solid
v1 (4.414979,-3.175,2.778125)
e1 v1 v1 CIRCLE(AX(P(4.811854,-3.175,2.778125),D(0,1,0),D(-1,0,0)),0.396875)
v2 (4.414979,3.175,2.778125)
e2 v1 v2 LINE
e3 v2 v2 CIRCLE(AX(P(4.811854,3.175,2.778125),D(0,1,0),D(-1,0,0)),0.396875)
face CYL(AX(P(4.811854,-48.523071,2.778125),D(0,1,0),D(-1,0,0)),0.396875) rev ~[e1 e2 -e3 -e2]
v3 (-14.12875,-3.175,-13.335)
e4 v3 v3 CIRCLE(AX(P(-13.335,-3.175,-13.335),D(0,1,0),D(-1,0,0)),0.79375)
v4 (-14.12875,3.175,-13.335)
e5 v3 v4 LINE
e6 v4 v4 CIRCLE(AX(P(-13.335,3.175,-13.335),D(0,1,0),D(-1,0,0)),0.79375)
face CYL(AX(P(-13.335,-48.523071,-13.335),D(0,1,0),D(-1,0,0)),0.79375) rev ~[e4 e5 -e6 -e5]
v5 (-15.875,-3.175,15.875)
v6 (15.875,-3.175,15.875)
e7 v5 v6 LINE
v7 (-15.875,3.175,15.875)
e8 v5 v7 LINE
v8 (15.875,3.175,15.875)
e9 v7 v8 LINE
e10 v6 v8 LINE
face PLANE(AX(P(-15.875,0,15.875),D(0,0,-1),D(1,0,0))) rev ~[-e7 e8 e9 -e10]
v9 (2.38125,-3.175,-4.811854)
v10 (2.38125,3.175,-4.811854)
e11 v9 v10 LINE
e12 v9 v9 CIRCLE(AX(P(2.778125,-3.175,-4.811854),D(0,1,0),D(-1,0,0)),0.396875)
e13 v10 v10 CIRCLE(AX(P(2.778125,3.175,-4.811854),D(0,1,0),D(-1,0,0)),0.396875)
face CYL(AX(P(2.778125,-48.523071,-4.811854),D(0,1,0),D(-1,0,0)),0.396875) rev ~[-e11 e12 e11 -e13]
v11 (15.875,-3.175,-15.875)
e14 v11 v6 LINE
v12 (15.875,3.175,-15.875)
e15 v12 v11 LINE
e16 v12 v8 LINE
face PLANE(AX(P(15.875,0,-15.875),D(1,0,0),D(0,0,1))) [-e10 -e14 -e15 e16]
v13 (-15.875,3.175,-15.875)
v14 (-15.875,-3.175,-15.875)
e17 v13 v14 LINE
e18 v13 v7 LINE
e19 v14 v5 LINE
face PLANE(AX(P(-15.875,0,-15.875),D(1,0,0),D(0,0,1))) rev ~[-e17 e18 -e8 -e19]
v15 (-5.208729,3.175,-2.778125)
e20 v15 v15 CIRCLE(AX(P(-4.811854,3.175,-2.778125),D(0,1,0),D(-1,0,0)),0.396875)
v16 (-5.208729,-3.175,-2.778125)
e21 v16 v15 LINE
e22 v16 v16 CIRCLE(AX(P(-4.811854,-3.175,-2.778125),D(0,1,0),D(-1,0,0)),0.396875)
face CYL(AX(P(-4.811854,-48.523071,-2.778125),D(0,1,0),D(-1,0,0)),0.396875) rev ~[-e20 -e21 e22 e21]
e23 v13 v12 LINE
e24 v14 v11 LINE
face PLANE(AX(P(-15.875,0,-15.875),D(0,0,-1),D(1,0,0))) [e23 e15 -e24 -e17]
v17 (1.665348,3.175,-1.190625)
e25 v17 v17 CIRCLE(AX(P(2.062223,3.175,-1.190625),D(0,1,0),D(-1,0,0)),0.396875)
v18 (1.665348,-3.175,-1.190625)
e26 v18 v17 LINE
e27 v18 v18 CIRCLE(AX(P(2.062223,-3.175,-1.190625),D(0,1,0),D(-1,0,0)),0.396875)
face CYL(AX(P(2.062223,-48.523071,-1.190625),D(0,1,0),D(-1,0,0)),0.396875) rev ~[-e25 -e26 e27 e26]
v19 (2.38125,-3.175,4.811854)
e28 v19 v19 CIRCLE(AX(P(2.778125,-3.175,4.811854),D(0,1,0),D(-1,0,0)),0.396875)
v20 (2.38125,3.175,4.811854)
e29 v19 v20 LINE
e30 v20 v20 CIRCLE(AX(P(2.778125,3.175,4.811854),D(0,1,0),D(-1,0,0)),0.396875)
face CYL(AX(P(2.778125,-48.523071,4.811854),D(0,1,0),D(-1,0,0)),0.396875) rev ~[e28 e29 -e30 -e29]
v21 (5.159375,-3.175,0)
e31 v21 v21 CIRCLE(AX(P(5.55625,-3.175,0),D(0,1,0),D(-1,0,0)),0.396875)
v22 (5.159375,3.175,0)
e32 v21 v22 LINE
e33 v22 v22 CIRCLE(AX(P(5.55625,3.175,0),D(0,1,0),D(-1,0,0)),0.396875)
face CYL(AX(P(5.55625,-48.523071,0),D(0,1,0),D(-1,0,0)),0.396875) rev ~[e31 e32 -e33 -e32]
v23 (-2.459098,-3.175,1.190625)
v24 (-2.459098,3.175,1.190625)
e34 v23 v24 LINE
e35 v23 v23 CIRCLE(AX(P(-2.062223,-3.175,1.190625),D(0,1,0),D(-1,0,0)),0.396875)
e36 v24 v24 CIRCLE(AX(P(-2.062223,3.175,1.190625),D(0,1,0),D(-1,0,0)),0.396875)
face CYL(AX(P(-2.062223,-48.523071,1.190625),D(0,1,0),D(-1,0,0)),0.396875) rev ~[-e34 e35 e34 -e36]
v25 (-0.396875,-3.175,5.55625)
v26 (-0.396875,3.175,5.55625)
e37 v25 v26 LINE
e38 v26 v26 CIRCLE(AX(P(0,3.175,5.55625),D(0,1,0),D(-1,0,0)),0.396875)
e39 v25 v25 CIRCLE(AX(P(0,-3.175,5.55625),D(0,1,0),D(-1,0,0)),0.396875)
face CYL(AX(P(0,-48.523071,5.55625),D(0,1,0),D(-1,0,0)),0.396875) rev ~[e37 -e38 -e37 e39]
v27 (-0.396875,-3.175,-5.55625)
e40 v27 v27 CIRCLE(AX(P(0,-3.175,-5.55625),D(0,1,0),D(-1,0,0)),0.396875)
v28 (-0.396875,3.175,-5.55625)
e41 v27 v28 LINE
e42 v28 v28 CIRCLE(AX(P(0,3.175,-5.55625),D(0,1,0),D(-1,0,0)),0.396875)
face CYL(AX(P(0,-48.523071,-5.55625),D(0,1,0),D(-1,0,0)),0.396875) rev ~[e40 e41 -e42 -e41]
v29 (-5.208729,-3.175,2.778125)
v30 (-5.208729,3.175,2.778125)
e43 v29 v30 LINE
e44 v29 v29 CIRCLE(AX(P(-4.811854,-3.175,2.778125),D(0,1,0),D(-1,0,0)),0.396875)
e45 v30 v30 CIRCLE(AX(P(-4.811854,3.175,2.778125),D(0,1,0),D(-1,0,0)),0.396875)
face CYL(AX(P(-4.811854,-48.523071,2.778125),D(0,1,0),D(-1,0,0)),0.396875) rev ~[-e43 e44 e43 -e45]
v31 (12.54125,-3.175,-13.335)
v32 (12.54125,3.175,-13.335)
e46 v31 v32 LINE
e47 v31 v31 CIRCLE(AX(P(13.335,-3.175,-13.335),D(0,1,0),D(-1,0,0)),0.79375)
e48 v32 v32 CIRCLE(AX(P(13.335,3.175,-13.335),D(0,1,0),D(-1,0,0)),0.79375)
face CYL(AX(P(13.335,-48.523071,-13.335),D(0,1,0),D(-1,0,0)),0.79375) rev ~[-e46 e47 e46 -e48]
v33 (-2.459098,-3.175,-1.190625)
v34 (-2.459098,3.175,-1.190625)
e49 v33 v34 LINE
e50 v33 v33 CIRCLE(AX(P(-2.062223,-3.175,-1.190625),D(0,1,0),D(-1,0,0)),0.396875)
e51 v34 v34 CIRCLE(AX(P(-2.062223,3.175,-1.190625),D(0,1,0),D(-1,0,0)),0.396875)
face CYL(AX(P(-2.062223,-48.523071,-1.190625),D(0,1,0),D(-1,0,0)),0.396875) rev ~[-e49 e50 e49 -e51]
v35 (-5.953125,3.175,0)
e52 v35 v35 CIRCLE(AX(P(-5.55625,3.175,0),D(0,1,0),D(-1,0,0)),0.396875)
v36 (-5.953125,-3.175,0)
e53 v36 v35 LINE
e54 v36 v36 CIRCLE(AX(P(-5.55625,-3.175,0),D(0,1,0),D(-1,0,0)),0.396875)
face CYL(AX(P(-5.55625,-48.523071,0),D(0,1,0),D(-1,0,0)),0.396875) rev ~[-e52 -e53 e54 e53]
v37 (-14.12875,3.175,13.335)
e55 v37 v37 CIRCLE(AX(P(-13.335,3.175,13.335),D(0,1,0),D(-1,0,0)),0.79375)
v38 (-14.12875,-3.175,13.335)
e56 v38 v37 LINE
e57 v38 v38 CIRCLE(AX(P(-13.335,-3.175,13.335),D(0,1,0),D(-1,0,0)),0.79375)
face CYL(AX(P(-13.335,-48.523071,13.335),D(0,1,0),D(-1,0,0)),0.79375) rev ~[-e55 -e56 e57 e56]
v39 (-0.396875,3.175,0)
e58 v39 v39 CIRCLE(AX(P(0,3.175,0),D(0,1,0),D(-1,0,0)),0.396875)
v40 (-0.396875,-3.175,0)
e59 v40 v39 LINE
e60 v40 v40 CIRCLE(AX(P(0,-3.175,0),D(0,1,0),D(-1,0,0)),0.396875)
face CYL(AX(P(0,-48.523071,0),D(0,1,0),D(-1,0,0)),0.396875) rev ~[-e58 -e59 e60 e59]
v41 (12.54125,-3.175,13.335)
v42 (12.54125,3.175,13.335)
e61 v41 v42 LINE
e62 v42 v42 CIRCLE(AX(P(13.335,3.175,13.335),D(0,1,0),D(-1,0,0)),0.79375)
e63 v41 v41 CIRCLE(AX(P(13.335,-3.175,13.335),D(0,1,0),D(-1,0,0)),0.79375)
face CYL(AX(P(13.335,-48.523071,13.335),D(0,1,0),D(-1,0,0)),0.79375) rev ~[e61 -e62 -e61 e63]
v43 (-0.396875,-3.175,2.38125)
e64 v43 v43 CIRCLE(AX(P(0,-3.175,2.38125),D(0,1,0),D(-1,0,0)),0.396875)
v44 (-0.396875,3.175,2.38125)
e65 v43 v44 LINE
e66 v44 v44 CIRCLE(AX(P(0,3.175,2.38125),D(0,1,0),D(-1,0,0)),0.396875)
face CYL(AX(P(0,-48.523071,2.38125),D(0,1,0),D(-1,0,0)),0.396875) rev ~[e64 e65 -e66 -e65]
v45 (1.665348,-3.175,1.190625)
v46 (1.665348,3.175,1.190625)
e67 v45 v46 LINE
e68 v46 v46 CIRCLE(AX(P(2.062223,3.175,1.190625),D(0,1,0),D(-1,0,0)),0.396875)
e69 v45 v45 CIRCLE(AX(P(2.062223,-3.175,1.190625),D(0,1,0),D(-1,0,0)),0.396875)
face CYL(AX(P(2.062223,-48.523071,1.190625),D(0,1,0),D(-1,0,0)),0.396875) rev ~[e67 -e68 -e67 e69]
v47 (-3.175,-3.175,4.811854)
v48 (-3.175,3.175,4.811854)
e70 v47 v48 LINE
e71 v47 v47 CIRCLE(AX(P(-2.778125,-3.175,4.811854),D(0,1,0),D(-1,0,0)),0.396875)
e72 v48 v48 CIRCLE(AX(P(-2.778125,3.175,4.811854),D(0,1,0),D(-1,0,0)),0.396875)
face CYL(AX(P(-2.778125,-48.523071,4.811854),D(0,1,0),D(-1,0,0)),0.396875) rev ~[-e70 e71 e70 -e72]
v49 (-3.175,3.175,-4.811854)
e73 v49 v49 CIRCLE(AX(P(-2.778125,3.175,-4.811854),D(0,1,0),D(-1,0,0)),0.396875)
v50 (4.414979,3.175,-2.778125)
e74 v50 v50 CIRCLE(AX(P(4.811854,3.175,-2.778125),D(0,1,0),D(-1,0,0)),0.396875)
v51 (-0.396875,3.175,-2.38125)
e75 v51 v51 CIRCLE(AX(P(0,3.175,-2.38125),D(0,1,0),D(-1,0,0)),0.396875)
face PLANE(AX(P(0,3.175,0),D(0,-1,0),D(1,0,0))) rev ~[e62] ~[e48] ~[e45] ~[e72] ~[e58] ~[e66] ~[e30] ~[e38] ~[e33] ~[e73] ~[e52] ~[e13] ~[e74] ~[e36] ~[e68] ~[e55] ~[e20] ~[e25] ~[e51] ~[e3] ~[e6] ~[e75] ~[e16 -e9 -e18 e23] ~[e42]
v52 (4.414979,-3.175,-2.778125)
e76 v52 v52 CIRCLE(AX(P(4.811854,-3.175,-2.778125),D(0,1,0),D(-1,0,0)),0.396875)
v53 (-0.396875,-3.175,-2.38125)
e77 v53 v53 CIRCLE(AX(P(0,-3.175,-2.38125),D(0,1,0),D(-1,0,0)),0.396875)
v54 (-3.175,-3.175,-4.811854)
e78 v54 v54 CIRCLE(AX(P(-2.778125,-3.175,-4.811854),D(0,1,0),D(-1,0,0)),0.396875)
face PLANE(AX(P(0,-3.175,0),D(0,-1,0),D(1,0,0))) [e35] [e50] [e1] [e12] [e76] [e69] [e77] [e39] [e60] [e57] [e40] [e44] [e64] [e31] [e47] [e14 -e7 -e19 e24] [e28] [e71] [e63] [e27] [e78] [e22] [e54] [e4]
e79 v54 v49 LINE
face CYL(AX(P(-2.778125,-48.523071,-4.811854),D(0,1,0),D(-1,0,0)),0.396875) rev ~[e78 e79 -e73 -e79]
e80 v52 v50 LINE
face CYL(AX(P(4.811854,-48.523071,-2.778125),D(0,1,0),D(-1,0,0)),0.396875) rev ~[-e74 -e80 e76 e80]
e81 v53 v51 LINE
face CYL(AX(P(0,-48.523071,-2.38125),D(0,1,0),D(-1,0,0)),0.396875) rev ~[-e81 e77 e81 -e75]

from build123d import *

# Parameters (mm, degrees)
F0_W     = 31.75
F0_H     = 31.75
F1_DEPTH = 3.175
F3_D     = 0.79375
F5_D     = 1.5875


# Not quite as in the source:
# - a feature names something its author has since deleted; it is built from what else it names


with BuildPart() as f1:
    # F0 (on Front) → F1 (new body, symmetric)
    with BuildSketch(Plane.XZ):
        Rectangle(F0_W, F0_H)
    extrude(amount=F1_DEPTH, both=True)

    # F3 (through all)
    with Locations(Plane.XZ.offset(3.175)):
        with Locations((0, 0), (0, 2.38125), (2.0622229928, 1.190625), (2.0622229928, -1.190625), (0, -2.38125), (-2.0622229928, -1.190625), (-2.0622229928, 1.190625), (-4.8118536498, 2.778125), (-2.778125, 4.8118536498), (0, 5.55625), (2.778125, 4.8118536498), (4.8118536498, 2.778125), (5.55625, 0), (4.8118536498, -2.778125), (2.778125, -4.8118536498), (0, -5.55625), (-2.778125, -4.8118536498), (-4.8118536498, -2.778125), (-5.55625, 0)):
            Hole(F3_D / 2)

    # F5 (through all)
    with Locations(Plane.XZ.offset(3.175)):
        with Locations((-13.335, 13.335), (-13.335, -13.335), (13.335, 13.335), (13.335, -13.335)):
            Hole(F5_D / 2)


solid = f1.part
